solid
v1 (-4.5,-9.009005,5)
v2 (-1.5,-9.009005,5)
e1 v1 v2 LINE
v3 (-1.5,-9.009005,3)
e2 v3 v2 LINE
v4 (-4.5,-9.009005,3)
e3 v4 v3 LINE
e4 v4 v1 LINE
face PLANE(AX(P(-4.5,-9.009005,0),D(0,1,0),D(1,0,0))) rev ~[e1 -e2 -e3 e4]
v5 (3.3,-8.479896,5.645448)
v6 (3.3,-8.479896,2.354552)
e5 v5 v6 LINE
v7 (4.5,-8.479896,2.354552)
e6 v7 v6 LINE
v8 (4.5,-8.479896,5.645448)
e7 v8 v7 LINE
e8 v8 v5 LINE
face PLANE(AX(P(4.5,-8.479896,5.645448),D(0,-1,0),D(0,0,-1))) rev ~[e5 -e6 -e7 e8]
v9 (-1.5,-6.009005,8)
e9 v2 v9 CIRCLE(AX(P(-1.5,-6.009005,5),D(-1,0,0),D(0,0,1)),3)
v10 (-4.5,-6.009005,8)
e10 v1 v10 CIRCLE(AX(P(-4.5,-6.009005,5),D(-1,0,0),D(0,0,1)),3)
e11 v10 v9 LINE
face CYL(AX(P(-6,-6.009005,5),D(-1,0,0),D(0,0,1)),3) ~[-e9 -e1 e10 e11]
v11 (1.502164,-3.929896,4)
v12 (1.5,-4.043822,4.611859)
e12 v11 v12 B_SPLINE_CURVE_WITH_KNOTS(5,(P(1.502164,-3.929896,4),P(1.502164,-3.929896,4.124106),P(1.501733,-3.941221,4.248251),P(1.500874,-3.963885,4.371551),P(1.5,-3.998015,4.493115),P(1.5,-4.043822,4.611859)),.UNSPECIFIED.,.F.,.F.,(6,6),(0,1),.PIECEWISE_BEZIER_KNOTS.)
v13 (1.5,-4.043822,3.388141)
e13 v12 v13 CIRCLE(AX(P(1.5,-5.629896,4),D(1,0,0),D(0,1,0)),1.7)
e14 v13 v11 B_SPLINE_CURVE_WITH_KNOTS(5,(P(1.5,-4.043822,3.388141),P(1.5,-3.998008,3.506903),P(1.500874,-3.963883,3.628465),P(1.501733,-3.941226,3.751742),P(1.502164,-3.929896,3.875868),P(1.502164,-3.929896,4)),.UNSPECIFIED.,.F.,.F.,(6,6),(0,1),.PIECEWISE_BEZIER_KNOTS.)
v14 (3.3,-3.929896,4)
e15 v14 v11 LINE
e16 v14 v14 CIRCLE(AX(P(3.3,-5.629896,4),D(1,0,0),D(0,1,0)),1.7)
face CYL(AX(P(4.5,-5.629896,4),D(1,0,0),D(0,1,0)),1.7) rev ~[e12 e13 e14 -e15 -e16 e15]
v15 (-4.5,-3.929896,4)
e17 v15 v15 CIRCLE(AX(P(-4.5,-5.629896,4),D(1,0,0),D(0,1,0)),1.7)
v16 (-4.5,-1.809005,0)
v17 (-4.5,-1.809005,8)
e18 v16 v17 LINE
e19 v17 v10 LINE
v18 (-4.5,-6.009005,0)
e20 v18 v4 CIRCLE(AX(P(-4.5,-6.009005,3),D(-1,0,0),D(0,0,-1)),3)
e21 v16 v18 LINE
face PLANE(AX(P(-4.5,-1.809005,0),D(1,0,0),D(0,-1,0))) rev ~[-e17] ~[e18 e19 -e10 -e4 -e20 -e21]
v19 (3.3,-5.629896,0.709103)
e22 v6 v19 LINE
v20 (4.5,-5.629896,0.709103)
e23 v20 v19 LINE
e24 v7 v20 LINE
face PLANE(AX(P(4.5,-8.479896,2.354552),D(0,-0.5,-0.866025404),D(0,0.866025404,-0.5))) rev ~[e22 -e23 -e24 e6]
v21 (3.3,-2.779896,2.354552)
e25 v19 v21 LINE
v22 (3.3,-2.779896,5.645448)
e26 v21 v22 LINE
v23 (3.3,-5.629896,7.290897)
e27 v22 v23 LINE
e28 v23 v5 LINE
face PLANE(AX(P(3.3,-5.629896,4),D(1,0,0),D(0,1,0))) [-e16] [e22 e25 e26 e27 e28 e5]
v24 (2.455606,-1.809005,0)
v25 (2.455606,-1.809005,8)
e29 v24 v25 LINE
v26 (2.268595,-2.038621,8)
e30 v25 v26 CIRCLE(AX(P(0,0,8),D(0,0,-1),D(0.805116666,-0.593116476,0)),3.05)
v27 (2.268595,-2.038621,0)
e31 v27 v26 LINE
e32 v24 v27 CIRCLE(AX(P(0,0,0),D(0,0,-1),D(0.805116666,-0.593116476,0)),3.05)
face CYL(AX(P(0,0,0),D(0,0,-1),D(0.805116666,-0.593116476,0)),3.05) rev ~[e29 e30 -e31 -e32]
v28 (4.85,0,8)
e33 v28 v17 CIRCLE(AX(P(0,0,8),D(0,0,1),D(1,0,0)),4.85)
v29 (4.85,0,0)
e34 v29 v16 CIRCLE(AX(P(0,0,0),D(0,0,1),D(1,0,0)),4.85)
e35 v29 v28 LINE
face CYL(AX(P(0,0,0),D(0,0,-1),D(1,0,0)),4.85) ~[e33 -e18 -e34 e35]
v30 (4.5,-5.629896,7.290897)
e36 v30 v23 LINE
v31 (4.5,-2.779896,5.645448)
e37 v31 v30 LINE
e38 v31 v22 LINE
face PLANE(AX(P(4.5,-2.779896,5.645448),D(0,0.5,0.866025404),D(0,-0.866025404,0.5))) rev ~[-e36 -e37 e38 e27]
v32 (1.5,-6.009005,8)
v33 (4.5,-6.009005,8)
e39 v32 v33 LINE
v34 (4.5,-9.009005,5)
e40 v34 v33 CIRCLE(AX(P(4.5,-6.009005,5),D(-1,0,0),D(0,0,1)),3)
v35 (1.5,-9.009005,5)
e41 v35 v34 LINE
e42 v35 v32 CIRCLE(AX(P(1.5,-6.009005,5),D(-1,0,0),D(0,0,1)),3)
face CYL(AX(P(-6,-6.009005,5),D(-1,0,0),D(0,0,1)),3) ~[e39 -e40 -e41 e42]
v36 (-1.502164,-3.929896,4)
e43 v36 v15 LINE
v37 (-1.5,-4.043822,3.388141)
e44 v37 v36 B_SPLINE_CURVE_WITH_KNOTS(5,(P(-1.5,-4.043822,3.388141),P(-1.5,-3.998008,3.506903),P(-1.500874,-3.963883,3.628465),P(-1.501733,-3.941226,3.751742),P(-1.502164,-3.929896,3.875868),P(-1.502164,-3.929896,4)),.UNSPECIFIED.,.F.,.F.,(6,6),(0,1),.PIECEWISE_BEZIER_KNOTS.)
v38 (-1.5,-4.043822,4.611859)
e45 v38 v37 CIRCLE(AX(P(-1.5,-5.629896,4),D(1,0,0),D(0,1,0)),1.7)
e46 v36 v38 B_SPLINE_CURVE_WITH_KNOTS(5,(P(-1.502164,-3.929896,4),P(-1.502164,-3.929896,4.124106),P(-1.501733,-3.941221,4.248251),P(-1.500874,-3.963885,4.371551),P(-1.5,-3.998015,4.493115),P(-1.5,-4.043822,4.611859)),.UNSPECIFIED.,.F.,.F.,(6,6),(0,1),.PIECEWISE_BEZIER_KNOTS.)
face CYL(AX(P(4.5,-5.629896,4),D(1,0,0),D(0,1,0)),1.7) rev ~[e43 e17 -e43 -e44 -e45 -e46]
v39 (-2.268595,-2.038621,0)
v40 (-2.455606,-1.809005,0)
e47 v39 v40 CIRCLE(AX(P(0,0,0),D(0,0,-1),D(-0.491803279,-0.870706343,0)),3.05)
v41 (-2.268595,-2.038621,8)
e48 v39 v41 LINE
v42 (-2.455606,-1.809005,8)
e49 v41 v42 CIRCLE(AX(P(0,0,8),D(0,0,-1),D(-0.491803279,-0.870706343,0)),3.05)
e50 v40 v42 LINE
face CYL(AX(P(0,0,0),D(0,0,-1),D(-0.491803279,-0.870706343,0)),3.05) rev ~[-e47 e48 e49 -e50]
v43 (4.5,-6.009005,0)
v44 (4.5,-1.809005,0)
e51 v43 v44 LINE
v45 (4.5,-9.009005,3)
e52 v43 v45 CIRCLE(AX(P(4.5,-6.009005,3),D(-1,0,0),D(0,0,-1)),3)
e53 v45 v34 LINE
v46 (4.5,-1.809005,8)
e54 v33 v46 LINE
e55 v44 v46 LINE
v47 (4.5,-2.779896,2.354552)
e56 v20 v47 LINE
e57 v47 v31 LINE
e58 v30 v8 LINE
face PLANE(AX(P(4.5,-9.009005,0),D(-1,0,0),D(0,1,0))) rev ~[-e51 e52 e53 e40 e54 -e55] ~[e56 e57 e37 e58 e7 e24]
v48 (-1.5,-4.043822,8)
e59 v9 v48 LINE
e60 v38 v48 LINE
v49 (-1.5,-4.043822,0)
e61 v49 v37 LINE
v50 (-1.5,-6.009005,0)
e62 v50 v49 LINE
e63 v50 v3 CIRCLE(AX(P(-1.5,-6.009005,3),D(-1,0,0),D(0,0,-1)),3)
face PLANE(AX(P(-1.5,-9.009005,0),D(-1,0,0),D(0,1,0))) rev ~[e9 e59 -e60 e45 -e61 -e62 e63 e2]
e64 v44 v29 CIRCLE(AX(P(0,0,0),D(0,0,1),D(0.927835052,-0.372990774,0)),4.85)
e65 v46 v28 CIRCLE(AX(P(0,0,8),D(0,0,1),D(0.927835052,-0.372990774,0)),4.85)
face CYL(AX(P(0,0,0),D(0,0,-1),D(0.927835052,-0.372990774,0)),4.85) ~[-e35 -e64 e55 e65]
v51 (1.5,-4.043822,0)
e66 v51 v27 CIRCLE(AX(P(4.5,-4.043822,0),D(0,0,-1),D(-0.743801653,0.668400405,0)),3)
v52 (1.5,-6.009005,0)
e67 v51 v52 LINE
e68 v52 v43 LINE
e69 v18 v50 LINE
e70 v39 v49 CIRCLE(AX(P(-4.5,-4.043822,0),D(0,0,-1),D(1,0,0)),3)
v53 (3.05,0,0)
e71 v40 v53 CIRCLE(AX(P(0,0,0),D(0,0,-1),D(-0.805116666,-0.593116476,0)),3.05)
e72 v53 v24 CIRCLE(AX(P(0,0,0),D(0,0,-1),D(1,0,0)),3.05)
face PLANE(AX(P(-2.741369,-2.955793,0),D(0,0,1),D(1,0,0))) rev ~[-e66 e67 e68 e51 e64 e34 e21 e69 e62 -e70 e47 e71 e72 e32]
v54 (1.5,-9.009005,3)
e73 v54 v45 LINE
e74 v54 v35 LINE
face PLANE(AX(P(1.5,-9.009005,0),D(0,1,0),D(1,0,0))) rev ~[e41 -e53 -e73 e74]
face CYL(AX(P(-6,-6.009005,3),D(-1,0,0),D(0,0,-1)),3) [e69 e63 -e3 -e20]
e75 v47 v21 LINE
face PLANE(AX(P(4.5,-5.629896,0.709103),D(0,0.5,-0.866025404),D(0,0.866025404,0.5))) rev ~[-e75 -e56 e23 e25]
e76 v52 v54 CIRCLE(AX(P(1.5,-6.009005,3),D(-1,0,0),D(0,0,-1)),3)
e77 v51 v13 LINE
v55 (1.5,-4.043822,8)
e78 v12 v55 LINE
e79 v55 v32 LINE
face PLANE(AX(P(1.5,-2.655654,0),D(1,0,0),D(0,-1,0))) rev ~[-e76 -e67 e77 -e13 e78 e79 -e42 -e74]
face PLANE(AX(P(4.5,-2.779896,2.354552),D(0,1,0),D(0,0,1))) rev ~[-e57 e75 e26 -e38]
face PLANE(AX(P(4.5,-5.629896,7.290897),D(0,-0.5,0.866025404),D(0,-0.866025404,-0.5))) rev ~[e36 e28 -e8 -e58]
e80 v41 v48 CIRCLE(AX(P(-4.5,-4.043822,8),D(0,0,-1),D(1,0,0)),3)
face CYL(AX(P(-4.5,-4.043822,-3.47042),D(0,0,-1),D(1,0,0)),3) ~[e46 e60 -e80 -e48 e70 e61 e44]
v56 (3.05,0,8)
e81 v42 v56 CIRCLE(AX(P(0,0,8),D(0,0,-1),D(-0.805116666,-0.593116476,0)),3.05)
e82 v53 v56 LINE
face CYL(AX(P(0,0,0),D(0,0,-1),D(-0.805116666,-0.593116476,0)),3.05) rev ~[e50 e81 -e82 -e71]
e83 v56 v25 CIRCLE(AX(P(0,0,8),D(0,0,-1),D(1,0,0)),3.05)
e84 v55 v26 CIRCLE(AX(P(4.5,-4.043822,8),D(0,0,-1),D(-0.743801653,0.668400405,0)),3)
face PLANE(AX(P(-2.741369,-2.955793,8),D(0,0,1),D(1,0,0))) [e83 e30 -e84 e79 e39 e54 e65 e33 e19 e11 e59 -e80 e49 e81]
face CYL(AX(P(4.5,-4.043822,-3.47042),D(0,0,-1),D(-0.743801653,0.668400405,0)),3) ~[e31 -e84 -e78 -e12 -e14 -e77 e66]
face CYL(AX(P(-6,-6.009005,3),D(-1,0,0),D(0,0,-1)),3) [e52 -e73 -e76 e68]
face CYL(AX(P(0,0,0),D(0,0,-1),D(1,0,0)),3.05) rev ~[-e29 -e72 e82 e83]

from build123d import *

# Parameters (mm, degrees)
F1_DEPTH    = 8
F2_R        = 1.7
F3_DEPTH    = 9.351
F2_R_2      = 2.75
F4_DEPTH    = 1.2
F5_T1_DEPTH = 14.9408405207
F5_T3_DEPTH = 18
F5_T5_DEPTH = 18


# Not quite as in the source:
# - a fillet or chamfer that OpenCascade refuses, or shapes differently, is made with other operations: its cross-section is extruded or revolved along the edge and cut away or added


with BuildPart() as f1:
    # F0 (on Top) → F1 (new body)
    with BuildSketch(Plane.XY):
        with BuildLine():
            Line((-1.5, -4.6122120506), (-1.5, -2.655654345))
            ThreePointArc((-1.5, -2.655654345), (-2.022599329, -2.2828911394), (-2.4556058316, -1.8090052515))
            Line((-2.4556058316, -1.8090052515), (-4.5, -1.8090052515))
            ThreePointArc((-4.5, -1.8090052515), (-3.3112674446, -3.5437279679), (-1.5, -4.6122120506))
        make_face()
        with BuildLine():
            ThreePointArc((2.4556058316, -1.8090052515), (2.022599329, -2.2828911394), (1.5, -2.655654345))
            Line((1.5, -2.655654345), (1.5, -4.6122120506))
            ThreePointArc((1.5, -4.6122120506), (3.3112674446, -3.5437279679), (4.5, -1.8090052515))
            Line((4.5, -1.8090052515), (2.4556058316, -1.8090052515))
        make_face()
        with BuildLine():
            ThreePointArc((4.5, -1.8090052515), (3.3112674446, -3.5437279679), (1.5, -4.6122120506))
            Line((1.5, -4.6122120506), (1.5, -9.0090052515))
            Line((1.5, -9.0090052515), (4.5, -9.0090052515))
            Line((4.5, -9.0090052515), (4.5, -1.8090052515))
        make_face()
        with BuildLine():
            Line((-1.5, -9.0090052515), (-1.5, -4.6122120506))
            ThreePointArc((-1.5, -4.6122120506), (-3.3112674446, -3.5437279679), (-4.5, -1.8090052515))
            Line((-4.5, -1.8090052515), (-4.5, -9.0090052515))
            Line((-4.5, -9.0090052515), (-1.5, -9.0090052515))
        make_face()
        with BuildLine():
            Line((-4.5, -1.8090052515), (-2.4556058316, -1.8090052515))
            ThreePointArc((-2.4556058316, -1.8090052515), (-0.9520772589, 2.8975936384), (3.05, 0))
            ThreePointArc((3.05, 0), (2.8975936384, -0.9520772589), (2.4556058316, -1.8090052515))
            Line((2.4556058316, -1.8090052515), (4.5, -1.8090052515))
            ThreePointArc((4.5, -1.8090052515), (4.7616961264, -0.9212762886), (4.85, 0))
            ThreePointArc((4.85, 0), (-0.9212762886, 4.7616961264), (-4.5, -1.8090052515))
        make_face()
    extrude(amount=F1_DEPTH)

    # F2 (on face) → F3 (cut, through all)
    with BuildSketch(Plane.YZ.offset(4.5)):
        with Locations((-5.6298957206, 4)):
            Circle(F2_R)
    extrude(amount=-F3_DEPTH, mode=Mode.SUBTRACT)

    # F2 (on face) → F4 (cut)
    with BuildSketch(Plane.YZ.offset(4.5)):
        Polygon((-8.4798957206, 5.6454482672), (-8.4798957206, 2.3545517328), (-5.6298957206, 0.7091034656), (-2.7798957206, 2.3545517328), (-2.7798957206, 5.6454482672), (-5.6298957206, 7.2908965344), align=None)
        with Locations((-5.6298957206, 4)):
            Circle(F2_R_2, mode=Mode.SUBTRACT)
        with Locations((-5.6298957206, 4)):
            Circle(F2_R_2)
        with Locations((-5.6298957206, 4)):
            Circle(F2_R, mode=Mode.SUBTRACT)
    extrude(amount=-F4_DEPTH, mode=Mode.SUBTRACT)

    # F5: fillet of radius 3 on 6 edges, made by hand

    # F5_s2 → F5_t1 (cut)
    with BuildSketch(Plane.XY.offset(-3.4704202604)):
        with BuildLine():
            ThreePointArc((2.2685950413, -2.0386212347), (1.6987311022, -2.9700941027), (1.5, -4.0438224491))
            Line((1.5, -4.0438224491), (1.5, -2.655654345))
            ThreePointArc((1.5, -2.655654345), (1.9093872345, -2.3783902936), (2.2685950413, -2.0386212347))
        make_face()
        with BuildLine():
            ThreePointArc((-1.5, -4.0438224491), (-1.6987311022, -2.9700941027), (-2.2685950413, -2.0386212347))
            ThreePointArc((-2.2685950413, -2.0386212347), (-1.9093872345, -2.3783902936), (-1.5, -2.655654345))
            Line((-1.5, -2.655654345), (-1.5, -4.0438224491))
        make_face()
    extrude(amount=F5_T1_DEPTH, mode=Mode.SUBTRACT)

    # F5_s4 → F5_t3 (cut)
    with BuildSketch(Plane.YZ.offset(-6)):
        with BuildLine():
            ThreePointArc((-6.0090052515, 8), (-8.1303255951, 7.1213203436), (-9.0090052515, 5))
            Line((-9.0090052515, 5), (-9.0090052515, 8))
            Line((-9.0090052515, 8), (-6.0090052515, 8))
        make_face()
        with BuildLine():
            ThreePointArc((-6.0090052515, 0), (-8.1303255951, 0.8786796564), (-9.0090052515, 3))
            Line((-9.0090052515, 3), (-9.0090052515, 0))
            Line((-9.0090052515, 0), (-6.0090052515, 0))
        make_face()
    extrude(amount=F5_T3_DEPTH, mode=Mode.SUBTRACT)

    # F5_s6 → F5_t5 (cut)
    with BuildSketch(Plane.YZ.offset(-12)):
        with BuildLine():
            ThreePointArc((-6.0090052515, 8), (-8.1303255951, 7.1213203436), (-9.0090052515, 5))
            Line((-9.0090052515, 5), (-9.0090052515, 8))
            Line((-9.0090052515, 8), (-6.0090052515, 8))
        make_face()
        with BuildLine():
            ThreePointArc((-6.0090052515, 0), (-8.1303255951, 0.8786796564), (-9.0090052515, 3))
            Line((-9.0090052515, 3), (-9.0090052515, 0))
            Line((-9.0090052515, 0), (-6.0090052515, 0))
        make_face()
    extrude(amount=F5_T5_DEPTH, mode=Mode.SUBTRACT)


solid = f1.part
